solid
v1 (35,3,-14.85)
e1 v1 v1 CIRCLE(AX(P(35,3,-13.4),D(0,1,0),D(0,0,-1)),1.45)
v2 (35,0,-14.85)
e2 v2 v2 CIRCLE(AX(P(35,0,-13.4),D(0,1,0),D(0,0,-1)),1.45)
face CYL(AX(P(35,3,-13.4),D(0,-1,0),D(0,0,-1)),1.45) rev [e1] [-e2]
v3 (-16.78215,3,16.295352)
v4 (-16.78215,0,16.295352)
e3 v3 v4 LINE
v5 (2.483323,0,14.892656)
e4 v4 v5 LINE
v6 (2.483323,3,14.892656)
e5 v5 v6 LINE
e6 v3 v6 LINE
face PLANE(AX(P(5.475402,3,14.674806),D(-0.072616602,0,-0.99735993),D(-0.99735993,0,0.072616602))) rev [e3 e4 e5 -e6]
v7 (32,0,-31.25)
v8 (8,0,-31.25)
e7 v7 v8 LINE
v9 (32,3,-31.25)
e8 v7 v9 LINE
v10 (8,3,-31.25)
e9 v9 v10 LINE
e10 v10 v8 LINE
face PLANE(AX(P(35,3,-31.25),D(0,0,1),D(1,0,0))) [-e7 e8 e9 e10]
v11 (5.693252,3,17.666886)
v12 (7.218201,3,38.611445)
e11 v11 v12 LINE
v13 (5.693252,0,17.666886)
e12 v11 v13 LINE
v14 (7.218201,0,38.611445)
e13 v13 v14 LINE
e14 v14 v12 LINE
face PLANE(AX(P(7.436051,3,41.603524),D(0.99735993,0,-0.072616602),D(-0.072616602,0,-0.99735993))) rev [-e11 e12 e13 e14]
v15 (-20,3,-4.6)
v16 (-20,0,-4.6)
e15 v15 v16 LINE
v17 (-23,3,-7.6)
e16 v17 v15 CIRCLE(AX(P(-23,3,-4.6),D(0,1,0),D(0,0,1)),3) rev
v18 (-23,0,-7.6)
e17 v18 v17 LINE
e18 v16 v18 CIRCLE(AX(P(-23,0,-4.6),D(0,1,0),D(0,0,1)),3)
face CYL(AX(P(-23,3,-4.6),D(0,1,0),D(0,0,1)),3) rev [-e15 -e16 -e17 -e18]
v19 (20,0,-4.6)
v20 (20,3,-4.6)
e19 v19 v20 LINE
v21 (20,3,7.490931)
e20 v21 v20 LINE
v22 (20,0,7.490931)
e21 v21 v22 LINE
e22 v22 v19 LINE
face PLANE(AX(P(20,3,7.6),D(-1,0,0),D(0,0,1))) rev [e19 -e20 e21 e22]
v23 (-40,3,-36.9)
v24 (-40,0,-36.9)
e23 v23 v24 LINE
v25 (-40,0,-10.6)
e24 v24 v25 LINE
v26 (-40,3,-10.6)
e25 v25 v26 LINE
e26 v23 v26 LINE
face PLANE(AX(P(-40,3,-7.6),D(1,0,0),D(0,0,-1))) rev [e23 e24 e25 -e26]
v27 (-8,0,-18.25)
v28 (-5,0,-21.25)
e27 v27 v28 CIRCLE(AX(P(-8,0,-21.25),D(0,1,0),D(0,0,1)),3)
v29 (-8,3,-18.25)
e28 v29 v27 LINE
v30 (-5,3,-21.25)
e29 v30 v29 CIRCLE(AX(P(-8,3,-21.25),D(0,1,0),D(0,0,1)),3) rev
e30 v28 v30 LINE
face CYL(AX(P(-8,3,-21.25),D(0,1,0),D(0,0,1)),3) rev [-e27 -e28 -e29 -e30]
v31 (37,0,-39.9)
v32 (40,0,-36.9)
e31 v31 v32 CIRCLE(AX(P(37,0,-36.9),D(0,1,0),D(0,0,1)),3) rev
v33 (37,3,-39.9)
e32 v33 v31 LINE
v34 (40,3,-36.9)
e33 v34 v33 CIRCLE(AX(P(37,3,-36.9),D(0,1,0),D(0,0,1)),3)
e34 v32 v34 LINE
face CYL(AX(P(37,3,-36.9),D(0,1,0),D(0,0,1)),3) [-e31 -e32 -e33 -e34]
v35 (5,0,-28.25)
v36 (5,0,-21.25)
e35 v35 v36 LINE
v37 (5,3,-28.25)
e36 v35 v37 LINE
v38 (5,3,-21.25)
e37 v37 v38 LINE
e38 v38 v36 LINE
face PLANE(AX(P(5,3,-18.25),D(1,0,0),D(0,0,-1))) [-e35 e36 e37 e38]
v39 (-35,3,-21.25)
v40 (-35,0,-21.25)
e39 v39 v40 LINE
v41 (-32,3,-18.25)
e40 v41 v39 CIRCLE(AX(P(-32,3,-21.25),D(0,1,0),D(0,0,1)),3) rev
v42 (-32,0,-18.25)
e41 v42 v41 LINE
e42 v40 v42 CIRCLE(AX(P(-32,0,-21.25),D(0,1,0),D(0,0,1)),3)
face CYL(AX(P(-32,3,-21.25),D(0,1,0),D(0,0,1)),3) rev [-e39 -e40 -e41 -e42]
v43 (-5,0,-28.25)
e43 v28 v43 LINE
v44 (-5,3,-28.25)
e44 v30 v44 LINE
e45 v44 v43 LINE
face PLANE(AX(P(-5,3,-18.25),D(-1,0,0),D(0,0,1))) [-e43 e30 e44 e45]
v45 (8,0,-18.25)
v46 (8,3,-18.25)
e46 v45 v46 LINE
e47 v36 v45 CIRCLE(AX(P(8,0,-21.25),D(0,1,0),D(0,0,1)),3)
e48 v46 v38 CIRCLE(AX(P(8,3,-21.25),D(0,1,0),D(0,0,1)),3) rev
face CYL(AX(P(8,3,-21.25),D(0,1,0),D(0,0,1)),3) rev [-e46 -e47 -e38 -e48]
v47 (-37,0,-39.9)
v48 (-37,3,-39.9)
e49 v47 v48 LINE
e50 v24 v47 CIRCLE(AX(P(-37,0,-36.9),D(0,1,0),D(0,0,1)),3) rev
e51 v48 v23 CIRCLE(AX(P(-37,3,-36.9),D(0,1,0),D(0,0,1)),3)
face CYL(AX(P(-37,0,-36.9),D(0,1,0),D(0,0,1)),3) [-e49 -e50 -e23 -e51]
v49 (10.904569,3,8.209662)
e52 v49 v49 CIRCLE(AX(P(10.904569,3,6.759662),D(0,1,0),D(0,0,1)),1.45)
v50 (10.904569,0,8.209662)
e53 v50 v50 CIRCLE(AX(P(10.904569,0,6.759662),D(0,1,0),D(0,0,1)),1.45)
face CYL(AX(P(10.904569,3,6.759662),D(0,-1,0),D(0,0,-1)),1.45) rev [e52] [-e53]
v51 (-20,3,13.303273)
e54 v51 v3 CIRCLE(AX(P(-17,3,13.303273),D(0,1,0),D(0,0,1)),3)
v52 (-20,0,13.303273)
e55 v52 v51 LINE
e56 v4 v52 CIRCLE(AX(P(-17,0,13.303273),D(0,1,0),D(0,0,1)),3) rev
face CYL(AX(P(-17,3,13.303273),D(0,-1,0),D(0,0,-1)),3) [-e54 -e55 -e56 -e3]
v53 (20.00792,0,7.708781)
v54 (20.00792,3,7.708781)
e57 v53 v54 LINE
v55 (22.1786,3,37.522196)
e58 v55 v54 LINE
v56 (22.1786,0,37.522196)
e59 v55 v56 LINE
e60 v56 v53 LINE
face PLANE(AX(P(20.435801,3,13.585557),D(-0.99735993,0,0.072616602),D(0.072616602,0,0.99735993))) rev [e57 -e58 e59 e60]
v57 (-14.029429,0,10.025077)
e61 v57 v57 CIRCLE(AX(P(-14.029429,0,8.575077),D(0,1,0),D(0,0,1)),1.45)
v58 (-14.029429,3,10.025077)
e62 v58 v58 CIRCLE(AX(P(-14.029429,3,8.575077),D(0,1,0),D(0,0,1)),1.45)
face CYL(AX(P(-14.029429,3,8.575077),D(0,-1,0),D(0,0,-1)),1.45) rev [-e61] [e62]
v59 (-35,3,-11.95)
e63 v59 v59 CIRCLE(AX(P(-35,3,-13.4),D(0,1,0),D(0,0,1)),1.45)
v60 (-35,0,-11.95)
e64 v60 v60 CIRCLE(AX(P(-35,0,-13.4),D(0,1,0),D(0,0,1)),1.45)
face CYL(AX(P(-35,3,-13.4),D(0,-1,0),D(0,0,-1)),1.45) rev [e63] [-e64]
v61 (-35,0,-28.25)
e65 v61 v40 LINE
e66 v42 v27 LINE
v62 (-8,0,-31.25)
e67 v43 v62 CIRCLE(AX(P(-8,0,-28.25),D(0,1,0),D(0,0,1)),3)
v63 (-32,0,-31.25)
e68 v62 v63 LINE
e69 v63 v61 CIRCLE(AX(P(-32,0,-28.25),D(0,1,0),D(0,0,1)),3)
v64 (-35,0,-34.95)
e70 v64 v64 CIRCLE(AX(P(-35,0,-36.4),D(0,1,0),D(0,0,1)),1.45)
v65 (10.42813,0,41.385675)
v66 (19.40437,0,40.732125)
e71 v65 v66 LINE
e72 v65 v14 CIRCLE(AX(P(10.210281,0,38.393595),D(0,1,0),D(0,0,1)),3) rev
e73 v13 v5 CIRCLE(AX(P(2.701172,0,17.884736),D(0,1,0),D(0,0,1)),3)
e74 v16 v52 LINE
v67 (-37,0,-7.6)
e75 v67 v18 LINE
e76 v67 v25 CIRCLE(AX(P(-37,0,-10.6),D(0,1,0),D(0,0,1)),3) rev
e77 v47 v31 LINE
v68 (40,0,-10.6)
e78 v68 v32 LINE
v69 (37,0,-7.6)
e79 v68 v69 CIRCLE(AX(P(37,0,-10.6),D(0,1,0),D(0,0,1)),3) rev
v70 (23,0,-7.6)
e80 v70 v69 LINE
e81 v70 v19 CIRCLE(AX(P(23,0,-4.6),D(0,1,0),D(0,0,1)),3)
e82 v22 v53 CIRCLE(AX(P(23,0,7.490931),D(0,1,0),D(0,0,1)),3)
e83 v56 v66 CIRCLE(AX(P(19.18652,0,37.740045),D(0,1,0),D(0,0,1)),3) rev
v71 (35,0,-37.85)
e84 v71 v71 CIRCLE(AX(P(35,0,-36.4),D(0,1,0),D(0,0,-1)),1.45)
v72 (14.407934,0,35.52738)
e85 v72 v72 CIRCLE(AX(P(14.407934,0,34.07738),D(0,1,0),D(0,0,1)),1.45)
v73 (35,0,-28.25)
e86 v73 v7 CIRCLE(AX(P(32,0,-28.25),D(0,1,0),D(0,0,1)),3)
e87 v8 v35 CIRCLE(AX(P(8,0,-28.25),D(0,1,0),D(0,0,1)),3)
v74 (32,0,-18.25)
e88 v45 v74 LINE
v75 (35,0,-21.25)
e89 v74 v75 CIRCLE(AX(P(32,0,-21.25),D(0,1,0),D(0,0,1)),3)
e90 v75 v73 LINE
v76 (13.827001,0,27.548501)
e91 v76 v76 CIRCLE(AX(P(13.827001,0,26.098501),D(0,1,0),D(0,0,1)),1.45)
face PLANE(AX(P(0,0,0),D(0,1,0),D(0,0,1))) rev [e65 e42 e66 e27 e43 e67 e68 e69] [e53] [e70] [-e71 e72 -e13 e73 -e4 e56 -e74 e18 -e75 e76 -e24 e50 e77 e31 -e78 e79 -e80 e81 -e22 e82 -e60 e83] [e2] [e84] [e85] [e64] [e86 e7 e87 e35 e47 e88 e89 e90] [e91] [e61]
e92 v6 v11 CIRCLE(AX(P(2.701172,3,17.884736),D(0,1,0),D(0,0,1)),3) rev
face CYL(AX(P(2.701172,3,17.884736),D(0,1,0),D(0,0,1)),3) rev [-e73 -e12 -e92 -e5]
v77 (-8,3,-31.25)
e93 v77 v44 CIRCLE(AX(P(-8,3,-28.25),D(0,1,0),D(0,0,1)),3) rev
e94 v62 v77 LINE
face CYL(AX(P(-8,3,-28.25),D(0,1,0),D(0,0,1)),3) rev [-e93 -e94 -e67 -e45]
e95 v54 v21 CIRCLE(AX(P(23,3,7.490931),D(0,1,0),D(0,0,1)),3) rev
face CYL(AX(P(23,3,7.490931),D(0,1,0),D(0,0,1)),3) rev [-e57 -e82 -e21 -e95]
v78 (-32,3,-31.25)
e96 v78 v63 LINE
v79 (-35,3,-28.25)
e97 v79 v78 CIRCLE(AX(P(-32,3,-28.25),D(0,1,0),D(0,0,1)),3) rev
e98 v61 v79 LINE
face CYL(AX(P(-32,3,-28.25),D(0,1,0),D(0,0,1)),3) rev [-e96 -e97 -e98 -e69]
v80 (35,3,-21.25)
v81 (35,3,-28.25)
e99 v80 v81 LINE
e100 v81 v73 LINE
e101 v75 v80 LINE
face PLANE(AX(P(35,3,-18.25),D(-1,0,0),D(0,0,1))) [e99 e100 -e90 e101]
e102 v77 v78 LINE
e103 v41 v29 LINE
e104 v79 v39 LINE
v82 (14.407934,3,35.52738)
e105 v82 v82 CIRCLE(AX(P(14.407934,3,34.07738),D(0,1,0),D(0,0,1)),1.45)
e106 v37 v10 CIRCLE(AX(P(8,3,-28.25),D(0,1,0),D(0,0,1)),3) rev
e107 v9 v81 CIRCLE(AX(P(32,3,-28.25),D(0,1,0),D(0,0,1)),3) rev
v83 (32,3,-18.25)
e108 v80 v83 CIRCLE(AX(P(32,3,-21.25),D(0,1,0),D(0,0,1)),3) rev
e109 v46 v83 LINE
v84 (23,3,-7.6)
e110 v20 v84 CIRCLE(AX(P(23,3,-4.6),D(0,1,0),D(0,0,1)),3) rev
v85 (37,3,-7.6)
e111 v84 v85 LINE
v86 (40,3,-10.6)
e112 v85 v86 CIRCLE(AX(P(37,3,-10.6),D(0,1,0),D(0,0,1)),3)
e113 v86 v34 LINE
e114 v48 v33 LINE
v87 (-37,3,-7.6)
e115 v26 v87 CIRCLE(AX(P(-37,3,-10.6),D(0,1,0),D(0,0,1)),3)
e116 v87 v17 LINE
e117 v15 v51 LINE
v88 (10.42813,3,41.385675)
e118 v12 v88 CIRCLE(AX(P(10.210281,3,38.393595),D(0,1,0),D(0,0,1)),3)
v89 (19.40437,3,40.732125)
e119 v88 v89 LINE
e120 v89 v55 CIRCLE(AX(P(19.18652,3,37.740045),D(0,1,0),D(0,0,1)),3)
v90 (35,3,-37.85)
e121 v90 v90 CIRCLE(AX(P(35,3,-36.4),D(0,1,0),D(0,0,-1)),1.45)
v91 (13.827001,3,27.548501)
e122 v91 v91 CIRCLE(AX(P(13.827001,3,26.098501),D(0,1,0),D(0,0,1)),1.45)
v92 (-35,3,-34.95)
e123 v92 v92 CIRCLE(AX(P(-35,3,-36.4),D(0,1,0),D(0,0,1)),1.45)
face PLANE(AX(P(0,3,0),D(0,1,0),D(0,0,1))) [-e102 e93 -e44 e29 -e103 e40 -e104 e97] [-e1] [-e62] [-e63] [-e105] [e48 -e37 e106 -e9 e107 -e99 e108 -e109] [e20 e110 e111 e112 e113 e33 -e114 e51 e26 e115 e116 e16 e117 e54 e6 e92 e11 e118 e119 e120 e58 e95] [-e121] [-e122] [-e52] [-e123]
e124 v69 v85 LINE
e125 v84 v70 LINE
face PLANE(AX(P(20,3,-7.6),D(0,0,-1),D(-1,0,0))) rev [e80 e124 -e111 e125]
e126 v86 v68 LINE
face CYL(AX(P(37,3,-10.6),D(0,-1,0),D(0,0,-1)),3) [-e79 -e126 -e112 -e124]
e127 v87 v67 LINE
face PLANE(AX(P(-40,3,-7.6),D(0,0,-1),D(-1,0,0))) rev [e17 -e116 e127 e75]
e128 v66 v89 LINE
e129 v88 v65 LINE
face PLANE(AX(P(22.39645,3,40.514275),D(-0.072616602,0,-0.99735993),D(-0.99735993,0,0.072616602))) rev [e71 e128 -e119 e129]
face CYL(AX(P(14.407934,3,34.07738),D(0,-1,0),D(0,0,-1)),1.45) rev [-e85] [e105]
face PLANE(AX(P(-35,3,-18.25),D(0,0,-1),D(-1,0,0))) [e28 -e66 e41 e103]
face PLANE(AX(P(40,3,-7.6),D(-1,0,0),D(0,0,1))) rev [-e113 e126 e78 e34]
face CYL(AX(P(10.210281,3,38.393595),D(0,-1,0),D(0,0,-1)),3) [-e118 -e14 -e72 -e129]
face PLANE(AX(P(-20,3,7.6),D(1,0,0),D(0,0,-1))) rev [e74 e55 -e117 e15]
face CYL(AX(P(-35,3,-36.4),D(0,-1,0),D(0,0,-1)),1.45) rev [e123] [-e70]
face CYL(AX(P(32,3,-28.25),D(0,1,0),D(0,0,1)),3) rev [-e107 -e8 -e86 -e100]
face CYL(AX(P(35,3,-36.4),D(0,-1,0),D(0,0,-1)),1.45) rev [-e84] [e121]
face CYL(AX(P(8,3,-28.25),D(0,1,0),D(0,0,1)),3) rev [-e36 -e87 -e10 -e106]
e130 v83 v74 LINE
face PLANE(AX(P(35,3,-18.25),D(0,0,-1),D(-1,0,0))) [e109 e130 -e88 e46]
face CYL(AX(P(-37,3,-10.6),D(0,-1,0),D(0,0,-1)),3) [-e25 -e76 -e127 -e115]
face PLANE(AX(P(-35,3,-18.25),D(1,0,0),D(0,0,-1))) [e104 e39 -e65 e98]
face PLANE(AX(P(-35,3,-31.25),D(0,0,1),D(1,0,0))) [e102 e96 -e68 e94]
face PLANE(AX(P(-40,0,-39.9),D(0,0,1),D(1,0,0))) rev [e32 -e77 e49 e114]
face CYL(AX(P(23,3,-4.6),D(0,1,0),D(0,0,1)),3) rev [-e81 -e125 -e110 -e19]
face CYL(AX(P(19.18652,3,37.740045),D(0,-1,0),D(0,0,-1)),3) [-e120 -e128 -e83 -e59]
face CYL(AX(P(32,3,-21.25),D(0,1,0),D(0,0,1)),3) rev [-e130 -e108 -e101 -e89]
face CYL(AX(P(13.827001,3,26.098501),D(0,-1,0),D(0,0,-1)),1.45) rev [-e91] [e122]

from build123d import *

# Parameters (mm, degrees)
SKETCH_1_R          = 1.45
SKETCH_1_W          = 30
SKETCH_1_H          = 13
EXTRUDE_1_DEPTH     = 3
SKETCH_2_W          = 80
SKETCH_2_H          = 2
CUT_EXTRUDE_1_DEPTH = 59.005258382
FILLET_1_R          = 3


with BuildPart() as part:
    # 草图1 → 凸台-拉伸1 (new body)
    with BuildSketch(Plane(origin=(0, 0, 0), x_dir=(1, 0, 0), z_dir=(0, 1, 0))):
        Polygon((-20, -7.6), (-20, 7.6), (-40, 7.6), (-40, 41.9), (40, 41.9), (40, 7.6), (20, 7.6), (20, -7.6), (20.435801373, -13.585557258), (22.396449617, -40.514275357), (7.436050673, -41.603524381), (5.475402429, -14.674806282), (-20, -16.529640324), align=None)
        with Locations(Location((-35, 13.4, 0), (0, 0, 270))):
            Circle(SKETCH_1_R, mode=Mode.SUBTRACT)
        with Locations(Location((-35, 36.4, 0), (0, 0, 270))):
            Circle(SKETCH_1_R, mode=Mode.SUBTRACT)
        with Locations(Location((35, 13.4, 0), (0, 0, 90))):
            Circle(SKETCH_1_R, mode=Mode.SUBTRACT)
        with Locations(Location((35, 36.4, 0), (0, 0, 90))):
            Circle(SKETCH_1_R, mode=Mode.SUBTRACT)
        with Locations(Location((-14.029429392, -8.57507717, 0), (0, 0, 270))):
            Circle(SKETCH_1_R, mode=Mode.SUBTRACT)
        with Locations(Location((10.904568848, -6.759662129, 0), (0, 0, 270))):
            Circle(SKETCH_1_R, mode=Mode.SUBTRACT)
        with Locations(Location((13.827001121, -26.098500925, 0), (0, 0, 270))):
            Circle(SKETCH_1_R, mode=Mode.SUBTRACT)
        with Locations(Location((14.407933934, -34.077380362, 0), (0, 0, 270))):
            Circle(SKETCH_1_R, mode=Mode.SUBTRACT)
        with Locations((-20, 24.75)):
            Rectangle(SKETCH_1_W, SKETCH_1_H, mode=Mode.SUBTRACT)
        with Locations((20, 24.75)):
            Rectangle(SKETCH_1_W, SKETCH_1_H, mode=Mode.SUBTRACT)
    extrude(amount=EXTRUDE_1_DEPTH)

    # 草图2 → 切除-拉伸1 (cut, through all)
    with BuildSketch(Plane(origin=(0, 3, 0), x_dir=(1, 0, 0), z_dir=(0, 1, 0))):
        with Locations((0, 40.9)):
            Rectangle(SKETCH_2_W, SKETCH_2_H)
    extrude(amount=-CUT_EXTRUDE_1_DEPTH, mode=Mode.SUBTRACT)

    # 圆角1
    # the kernel refuses this fillet: 3 mm, written as the material it adds along each edge
    with BuildSketch(Plane(origin=(20, 0, -7.6), x_dir=(0, 0, 1), z_dir=(0, 1, 0)), Plane(origin=(5.475402429, 0, 14.674806282), x_dir=(-0.9973599295981227, 0, 0.07261660162819321), z_dir=(0, 1, 0)), Plane(origin=(-35, 0, -31.25), x_dir=(0, 0, 1), z_dir=(0, 1, 0)), Plane(origin=(-35, 0, -18.25), x_dir=(1, 0, 0), z_dir=(0, 1, 0)), Plane(origin=(5, 0, -18.25), x_dir=(1, 0, 0), z_dir=(0, 1, 0)), Plane(origin=(5, 0, -31.25), x_dir=(0, 0, 1), z_dir=(0, 1, 0))) as fillet_1_piece_1:
        with BuildLine():
            CenterArc((FILLET_1_R, FILLET_1_R), FILLET_1_R, 180, 90)
            Line((0, FILLET_1_R), (0, 0))
            Line((0, 0), (FILLET_1_R, 0))
        make_face()
    extrude(amount=3)
    with BuildSketch(Plane(origin=(20, 0, 7.6), x_dir=(0.07261660162820198, 0, 0.9973599295981221), z_dir=(0, 1, 0))) as fillet_1_piece_2:
        with BuildLine():
            CenterArc((FILLET_1_R * 0.0363562923998, FILLET_1_R), FILLET_1_R, 265.835709886, 4.164290114)
            Line((-FILLET_1_R * 0.0362603092284, FILLET_1_R * 0.00264007040188), (0, 0))
            Line((0, 0), (FILLET_1_R * 0.0363562923998, 0))
        make_face()
    extrude(amount=3)
    with BuildSketch(Plane(origin=(-20, 0, -7.6), x_dir=(0, 0, 1), z_dir=(0, 1, 0)), Plane(origin=(-5, 0, -18.25), x_dir=(-1, 0, 0), z_dir=(0, 1, 0)), Plane(origin=(-5, 0, -31.25), x_dir=(0, 0, 1), z_dir=(0, 1, 0)), Plane(origin=(35, 0, -18.25), x_dir=(-1, 0, 0), z_dir=(0, 1, 0)), Plane(origin=(35, 0, -31.25), x_dir=(0, 0, 1), z_dir=(0, 1, 0))) as fillet_1_piece_3:
        with BuildLine():
            CenterArc((FILLET_1_R, -FILLET_1_R), FILLET_1_R, 90, 90)
            Line((0, -FILLET_1_R), (0, 0))
            Line((0, 0), (FILLET_1_R, 0))
        make_face()
    extrude(amount=3)
    # the kernel refuses this fillet: 3 mm, written as the material it takes off along each edge
    with BuildSketch(Plane(origin=(-40, 10.5, -39.9), x_dir=(1, 0, 0), z_dir=(0, -1, 0)), Plane(origin=(40, 10.5, -39.9), x_dir=(0, 0, 1), z_dir=(0, -1, 0)), Plane(origin=(-40, -7.5, -7.6), x_dir=(1, 0, 0), z_dir=(0, 1, 0))) as fillet_1_2_piece_1:
        with BuildLine():
            CenterArc((FILLET_1_R, FILLET_1_R), FILLET_1_R, 180, 90)
            Line((0, FILLET_1_R), (0, 0))
            Line((0, 0), (FILLET_1_R, 0))
        make_face()
    extrude(amount=18, mode=Mode.SUBTRACT)
    with BuildSketch(Plane(origin=(22.396449617, -7.5, 40.514275357), x_dir=(-0.9973599295981227, 0, 0.07261660162819322), z_dir=(0, 1, 0)), Plane(origin=(7.436050673, -7.5, 41.603524381), x_dir=(-0.07261660162819356, 0, -0.9973599295981227), z_dir=(0, 1, 0)), Plane(origin=(40, -7.5, -7.6), x_dir=(-1, 0, 0), z_dir=(0, 1, 0))) as fillet_1_2_piece_2:
        with BuildLine():
            CenterArc((FILLET_1_R, -FILLET_1_R), FILLET_1_R, 90, 90)
            Line((0, -FILLET_1_R), (0, 0))
            Line((0, 0), (FILLET_1_R, 0))
        make_face()
    extrude(amount=18, mode=Mode.SUBTRACT)
    with BuildSketch(Plane(origin=(-20, -8.065919107, 16.529640324), x_dir=(0, 0, -1), z_dir=(0, 1, 0))) as fillet_1_2_piece_3:
        with BuildLine():
            CenterArc((FILLET_1_R * 1.07545588087, -FILLET_1_R), FILLET_1_R, 90, 94.164290114)
            Line((FILLET_1_R * 0.0780959512697, -FILLET_1_R * 1.07261660163), (0, 0))
            Line((0, 0), (FILLET_1_R * 1.07545588087, 0))
        make_face()
    extrude(amount=19.131838213, mode=Mode.SUBTRACT)


solid = part.part
